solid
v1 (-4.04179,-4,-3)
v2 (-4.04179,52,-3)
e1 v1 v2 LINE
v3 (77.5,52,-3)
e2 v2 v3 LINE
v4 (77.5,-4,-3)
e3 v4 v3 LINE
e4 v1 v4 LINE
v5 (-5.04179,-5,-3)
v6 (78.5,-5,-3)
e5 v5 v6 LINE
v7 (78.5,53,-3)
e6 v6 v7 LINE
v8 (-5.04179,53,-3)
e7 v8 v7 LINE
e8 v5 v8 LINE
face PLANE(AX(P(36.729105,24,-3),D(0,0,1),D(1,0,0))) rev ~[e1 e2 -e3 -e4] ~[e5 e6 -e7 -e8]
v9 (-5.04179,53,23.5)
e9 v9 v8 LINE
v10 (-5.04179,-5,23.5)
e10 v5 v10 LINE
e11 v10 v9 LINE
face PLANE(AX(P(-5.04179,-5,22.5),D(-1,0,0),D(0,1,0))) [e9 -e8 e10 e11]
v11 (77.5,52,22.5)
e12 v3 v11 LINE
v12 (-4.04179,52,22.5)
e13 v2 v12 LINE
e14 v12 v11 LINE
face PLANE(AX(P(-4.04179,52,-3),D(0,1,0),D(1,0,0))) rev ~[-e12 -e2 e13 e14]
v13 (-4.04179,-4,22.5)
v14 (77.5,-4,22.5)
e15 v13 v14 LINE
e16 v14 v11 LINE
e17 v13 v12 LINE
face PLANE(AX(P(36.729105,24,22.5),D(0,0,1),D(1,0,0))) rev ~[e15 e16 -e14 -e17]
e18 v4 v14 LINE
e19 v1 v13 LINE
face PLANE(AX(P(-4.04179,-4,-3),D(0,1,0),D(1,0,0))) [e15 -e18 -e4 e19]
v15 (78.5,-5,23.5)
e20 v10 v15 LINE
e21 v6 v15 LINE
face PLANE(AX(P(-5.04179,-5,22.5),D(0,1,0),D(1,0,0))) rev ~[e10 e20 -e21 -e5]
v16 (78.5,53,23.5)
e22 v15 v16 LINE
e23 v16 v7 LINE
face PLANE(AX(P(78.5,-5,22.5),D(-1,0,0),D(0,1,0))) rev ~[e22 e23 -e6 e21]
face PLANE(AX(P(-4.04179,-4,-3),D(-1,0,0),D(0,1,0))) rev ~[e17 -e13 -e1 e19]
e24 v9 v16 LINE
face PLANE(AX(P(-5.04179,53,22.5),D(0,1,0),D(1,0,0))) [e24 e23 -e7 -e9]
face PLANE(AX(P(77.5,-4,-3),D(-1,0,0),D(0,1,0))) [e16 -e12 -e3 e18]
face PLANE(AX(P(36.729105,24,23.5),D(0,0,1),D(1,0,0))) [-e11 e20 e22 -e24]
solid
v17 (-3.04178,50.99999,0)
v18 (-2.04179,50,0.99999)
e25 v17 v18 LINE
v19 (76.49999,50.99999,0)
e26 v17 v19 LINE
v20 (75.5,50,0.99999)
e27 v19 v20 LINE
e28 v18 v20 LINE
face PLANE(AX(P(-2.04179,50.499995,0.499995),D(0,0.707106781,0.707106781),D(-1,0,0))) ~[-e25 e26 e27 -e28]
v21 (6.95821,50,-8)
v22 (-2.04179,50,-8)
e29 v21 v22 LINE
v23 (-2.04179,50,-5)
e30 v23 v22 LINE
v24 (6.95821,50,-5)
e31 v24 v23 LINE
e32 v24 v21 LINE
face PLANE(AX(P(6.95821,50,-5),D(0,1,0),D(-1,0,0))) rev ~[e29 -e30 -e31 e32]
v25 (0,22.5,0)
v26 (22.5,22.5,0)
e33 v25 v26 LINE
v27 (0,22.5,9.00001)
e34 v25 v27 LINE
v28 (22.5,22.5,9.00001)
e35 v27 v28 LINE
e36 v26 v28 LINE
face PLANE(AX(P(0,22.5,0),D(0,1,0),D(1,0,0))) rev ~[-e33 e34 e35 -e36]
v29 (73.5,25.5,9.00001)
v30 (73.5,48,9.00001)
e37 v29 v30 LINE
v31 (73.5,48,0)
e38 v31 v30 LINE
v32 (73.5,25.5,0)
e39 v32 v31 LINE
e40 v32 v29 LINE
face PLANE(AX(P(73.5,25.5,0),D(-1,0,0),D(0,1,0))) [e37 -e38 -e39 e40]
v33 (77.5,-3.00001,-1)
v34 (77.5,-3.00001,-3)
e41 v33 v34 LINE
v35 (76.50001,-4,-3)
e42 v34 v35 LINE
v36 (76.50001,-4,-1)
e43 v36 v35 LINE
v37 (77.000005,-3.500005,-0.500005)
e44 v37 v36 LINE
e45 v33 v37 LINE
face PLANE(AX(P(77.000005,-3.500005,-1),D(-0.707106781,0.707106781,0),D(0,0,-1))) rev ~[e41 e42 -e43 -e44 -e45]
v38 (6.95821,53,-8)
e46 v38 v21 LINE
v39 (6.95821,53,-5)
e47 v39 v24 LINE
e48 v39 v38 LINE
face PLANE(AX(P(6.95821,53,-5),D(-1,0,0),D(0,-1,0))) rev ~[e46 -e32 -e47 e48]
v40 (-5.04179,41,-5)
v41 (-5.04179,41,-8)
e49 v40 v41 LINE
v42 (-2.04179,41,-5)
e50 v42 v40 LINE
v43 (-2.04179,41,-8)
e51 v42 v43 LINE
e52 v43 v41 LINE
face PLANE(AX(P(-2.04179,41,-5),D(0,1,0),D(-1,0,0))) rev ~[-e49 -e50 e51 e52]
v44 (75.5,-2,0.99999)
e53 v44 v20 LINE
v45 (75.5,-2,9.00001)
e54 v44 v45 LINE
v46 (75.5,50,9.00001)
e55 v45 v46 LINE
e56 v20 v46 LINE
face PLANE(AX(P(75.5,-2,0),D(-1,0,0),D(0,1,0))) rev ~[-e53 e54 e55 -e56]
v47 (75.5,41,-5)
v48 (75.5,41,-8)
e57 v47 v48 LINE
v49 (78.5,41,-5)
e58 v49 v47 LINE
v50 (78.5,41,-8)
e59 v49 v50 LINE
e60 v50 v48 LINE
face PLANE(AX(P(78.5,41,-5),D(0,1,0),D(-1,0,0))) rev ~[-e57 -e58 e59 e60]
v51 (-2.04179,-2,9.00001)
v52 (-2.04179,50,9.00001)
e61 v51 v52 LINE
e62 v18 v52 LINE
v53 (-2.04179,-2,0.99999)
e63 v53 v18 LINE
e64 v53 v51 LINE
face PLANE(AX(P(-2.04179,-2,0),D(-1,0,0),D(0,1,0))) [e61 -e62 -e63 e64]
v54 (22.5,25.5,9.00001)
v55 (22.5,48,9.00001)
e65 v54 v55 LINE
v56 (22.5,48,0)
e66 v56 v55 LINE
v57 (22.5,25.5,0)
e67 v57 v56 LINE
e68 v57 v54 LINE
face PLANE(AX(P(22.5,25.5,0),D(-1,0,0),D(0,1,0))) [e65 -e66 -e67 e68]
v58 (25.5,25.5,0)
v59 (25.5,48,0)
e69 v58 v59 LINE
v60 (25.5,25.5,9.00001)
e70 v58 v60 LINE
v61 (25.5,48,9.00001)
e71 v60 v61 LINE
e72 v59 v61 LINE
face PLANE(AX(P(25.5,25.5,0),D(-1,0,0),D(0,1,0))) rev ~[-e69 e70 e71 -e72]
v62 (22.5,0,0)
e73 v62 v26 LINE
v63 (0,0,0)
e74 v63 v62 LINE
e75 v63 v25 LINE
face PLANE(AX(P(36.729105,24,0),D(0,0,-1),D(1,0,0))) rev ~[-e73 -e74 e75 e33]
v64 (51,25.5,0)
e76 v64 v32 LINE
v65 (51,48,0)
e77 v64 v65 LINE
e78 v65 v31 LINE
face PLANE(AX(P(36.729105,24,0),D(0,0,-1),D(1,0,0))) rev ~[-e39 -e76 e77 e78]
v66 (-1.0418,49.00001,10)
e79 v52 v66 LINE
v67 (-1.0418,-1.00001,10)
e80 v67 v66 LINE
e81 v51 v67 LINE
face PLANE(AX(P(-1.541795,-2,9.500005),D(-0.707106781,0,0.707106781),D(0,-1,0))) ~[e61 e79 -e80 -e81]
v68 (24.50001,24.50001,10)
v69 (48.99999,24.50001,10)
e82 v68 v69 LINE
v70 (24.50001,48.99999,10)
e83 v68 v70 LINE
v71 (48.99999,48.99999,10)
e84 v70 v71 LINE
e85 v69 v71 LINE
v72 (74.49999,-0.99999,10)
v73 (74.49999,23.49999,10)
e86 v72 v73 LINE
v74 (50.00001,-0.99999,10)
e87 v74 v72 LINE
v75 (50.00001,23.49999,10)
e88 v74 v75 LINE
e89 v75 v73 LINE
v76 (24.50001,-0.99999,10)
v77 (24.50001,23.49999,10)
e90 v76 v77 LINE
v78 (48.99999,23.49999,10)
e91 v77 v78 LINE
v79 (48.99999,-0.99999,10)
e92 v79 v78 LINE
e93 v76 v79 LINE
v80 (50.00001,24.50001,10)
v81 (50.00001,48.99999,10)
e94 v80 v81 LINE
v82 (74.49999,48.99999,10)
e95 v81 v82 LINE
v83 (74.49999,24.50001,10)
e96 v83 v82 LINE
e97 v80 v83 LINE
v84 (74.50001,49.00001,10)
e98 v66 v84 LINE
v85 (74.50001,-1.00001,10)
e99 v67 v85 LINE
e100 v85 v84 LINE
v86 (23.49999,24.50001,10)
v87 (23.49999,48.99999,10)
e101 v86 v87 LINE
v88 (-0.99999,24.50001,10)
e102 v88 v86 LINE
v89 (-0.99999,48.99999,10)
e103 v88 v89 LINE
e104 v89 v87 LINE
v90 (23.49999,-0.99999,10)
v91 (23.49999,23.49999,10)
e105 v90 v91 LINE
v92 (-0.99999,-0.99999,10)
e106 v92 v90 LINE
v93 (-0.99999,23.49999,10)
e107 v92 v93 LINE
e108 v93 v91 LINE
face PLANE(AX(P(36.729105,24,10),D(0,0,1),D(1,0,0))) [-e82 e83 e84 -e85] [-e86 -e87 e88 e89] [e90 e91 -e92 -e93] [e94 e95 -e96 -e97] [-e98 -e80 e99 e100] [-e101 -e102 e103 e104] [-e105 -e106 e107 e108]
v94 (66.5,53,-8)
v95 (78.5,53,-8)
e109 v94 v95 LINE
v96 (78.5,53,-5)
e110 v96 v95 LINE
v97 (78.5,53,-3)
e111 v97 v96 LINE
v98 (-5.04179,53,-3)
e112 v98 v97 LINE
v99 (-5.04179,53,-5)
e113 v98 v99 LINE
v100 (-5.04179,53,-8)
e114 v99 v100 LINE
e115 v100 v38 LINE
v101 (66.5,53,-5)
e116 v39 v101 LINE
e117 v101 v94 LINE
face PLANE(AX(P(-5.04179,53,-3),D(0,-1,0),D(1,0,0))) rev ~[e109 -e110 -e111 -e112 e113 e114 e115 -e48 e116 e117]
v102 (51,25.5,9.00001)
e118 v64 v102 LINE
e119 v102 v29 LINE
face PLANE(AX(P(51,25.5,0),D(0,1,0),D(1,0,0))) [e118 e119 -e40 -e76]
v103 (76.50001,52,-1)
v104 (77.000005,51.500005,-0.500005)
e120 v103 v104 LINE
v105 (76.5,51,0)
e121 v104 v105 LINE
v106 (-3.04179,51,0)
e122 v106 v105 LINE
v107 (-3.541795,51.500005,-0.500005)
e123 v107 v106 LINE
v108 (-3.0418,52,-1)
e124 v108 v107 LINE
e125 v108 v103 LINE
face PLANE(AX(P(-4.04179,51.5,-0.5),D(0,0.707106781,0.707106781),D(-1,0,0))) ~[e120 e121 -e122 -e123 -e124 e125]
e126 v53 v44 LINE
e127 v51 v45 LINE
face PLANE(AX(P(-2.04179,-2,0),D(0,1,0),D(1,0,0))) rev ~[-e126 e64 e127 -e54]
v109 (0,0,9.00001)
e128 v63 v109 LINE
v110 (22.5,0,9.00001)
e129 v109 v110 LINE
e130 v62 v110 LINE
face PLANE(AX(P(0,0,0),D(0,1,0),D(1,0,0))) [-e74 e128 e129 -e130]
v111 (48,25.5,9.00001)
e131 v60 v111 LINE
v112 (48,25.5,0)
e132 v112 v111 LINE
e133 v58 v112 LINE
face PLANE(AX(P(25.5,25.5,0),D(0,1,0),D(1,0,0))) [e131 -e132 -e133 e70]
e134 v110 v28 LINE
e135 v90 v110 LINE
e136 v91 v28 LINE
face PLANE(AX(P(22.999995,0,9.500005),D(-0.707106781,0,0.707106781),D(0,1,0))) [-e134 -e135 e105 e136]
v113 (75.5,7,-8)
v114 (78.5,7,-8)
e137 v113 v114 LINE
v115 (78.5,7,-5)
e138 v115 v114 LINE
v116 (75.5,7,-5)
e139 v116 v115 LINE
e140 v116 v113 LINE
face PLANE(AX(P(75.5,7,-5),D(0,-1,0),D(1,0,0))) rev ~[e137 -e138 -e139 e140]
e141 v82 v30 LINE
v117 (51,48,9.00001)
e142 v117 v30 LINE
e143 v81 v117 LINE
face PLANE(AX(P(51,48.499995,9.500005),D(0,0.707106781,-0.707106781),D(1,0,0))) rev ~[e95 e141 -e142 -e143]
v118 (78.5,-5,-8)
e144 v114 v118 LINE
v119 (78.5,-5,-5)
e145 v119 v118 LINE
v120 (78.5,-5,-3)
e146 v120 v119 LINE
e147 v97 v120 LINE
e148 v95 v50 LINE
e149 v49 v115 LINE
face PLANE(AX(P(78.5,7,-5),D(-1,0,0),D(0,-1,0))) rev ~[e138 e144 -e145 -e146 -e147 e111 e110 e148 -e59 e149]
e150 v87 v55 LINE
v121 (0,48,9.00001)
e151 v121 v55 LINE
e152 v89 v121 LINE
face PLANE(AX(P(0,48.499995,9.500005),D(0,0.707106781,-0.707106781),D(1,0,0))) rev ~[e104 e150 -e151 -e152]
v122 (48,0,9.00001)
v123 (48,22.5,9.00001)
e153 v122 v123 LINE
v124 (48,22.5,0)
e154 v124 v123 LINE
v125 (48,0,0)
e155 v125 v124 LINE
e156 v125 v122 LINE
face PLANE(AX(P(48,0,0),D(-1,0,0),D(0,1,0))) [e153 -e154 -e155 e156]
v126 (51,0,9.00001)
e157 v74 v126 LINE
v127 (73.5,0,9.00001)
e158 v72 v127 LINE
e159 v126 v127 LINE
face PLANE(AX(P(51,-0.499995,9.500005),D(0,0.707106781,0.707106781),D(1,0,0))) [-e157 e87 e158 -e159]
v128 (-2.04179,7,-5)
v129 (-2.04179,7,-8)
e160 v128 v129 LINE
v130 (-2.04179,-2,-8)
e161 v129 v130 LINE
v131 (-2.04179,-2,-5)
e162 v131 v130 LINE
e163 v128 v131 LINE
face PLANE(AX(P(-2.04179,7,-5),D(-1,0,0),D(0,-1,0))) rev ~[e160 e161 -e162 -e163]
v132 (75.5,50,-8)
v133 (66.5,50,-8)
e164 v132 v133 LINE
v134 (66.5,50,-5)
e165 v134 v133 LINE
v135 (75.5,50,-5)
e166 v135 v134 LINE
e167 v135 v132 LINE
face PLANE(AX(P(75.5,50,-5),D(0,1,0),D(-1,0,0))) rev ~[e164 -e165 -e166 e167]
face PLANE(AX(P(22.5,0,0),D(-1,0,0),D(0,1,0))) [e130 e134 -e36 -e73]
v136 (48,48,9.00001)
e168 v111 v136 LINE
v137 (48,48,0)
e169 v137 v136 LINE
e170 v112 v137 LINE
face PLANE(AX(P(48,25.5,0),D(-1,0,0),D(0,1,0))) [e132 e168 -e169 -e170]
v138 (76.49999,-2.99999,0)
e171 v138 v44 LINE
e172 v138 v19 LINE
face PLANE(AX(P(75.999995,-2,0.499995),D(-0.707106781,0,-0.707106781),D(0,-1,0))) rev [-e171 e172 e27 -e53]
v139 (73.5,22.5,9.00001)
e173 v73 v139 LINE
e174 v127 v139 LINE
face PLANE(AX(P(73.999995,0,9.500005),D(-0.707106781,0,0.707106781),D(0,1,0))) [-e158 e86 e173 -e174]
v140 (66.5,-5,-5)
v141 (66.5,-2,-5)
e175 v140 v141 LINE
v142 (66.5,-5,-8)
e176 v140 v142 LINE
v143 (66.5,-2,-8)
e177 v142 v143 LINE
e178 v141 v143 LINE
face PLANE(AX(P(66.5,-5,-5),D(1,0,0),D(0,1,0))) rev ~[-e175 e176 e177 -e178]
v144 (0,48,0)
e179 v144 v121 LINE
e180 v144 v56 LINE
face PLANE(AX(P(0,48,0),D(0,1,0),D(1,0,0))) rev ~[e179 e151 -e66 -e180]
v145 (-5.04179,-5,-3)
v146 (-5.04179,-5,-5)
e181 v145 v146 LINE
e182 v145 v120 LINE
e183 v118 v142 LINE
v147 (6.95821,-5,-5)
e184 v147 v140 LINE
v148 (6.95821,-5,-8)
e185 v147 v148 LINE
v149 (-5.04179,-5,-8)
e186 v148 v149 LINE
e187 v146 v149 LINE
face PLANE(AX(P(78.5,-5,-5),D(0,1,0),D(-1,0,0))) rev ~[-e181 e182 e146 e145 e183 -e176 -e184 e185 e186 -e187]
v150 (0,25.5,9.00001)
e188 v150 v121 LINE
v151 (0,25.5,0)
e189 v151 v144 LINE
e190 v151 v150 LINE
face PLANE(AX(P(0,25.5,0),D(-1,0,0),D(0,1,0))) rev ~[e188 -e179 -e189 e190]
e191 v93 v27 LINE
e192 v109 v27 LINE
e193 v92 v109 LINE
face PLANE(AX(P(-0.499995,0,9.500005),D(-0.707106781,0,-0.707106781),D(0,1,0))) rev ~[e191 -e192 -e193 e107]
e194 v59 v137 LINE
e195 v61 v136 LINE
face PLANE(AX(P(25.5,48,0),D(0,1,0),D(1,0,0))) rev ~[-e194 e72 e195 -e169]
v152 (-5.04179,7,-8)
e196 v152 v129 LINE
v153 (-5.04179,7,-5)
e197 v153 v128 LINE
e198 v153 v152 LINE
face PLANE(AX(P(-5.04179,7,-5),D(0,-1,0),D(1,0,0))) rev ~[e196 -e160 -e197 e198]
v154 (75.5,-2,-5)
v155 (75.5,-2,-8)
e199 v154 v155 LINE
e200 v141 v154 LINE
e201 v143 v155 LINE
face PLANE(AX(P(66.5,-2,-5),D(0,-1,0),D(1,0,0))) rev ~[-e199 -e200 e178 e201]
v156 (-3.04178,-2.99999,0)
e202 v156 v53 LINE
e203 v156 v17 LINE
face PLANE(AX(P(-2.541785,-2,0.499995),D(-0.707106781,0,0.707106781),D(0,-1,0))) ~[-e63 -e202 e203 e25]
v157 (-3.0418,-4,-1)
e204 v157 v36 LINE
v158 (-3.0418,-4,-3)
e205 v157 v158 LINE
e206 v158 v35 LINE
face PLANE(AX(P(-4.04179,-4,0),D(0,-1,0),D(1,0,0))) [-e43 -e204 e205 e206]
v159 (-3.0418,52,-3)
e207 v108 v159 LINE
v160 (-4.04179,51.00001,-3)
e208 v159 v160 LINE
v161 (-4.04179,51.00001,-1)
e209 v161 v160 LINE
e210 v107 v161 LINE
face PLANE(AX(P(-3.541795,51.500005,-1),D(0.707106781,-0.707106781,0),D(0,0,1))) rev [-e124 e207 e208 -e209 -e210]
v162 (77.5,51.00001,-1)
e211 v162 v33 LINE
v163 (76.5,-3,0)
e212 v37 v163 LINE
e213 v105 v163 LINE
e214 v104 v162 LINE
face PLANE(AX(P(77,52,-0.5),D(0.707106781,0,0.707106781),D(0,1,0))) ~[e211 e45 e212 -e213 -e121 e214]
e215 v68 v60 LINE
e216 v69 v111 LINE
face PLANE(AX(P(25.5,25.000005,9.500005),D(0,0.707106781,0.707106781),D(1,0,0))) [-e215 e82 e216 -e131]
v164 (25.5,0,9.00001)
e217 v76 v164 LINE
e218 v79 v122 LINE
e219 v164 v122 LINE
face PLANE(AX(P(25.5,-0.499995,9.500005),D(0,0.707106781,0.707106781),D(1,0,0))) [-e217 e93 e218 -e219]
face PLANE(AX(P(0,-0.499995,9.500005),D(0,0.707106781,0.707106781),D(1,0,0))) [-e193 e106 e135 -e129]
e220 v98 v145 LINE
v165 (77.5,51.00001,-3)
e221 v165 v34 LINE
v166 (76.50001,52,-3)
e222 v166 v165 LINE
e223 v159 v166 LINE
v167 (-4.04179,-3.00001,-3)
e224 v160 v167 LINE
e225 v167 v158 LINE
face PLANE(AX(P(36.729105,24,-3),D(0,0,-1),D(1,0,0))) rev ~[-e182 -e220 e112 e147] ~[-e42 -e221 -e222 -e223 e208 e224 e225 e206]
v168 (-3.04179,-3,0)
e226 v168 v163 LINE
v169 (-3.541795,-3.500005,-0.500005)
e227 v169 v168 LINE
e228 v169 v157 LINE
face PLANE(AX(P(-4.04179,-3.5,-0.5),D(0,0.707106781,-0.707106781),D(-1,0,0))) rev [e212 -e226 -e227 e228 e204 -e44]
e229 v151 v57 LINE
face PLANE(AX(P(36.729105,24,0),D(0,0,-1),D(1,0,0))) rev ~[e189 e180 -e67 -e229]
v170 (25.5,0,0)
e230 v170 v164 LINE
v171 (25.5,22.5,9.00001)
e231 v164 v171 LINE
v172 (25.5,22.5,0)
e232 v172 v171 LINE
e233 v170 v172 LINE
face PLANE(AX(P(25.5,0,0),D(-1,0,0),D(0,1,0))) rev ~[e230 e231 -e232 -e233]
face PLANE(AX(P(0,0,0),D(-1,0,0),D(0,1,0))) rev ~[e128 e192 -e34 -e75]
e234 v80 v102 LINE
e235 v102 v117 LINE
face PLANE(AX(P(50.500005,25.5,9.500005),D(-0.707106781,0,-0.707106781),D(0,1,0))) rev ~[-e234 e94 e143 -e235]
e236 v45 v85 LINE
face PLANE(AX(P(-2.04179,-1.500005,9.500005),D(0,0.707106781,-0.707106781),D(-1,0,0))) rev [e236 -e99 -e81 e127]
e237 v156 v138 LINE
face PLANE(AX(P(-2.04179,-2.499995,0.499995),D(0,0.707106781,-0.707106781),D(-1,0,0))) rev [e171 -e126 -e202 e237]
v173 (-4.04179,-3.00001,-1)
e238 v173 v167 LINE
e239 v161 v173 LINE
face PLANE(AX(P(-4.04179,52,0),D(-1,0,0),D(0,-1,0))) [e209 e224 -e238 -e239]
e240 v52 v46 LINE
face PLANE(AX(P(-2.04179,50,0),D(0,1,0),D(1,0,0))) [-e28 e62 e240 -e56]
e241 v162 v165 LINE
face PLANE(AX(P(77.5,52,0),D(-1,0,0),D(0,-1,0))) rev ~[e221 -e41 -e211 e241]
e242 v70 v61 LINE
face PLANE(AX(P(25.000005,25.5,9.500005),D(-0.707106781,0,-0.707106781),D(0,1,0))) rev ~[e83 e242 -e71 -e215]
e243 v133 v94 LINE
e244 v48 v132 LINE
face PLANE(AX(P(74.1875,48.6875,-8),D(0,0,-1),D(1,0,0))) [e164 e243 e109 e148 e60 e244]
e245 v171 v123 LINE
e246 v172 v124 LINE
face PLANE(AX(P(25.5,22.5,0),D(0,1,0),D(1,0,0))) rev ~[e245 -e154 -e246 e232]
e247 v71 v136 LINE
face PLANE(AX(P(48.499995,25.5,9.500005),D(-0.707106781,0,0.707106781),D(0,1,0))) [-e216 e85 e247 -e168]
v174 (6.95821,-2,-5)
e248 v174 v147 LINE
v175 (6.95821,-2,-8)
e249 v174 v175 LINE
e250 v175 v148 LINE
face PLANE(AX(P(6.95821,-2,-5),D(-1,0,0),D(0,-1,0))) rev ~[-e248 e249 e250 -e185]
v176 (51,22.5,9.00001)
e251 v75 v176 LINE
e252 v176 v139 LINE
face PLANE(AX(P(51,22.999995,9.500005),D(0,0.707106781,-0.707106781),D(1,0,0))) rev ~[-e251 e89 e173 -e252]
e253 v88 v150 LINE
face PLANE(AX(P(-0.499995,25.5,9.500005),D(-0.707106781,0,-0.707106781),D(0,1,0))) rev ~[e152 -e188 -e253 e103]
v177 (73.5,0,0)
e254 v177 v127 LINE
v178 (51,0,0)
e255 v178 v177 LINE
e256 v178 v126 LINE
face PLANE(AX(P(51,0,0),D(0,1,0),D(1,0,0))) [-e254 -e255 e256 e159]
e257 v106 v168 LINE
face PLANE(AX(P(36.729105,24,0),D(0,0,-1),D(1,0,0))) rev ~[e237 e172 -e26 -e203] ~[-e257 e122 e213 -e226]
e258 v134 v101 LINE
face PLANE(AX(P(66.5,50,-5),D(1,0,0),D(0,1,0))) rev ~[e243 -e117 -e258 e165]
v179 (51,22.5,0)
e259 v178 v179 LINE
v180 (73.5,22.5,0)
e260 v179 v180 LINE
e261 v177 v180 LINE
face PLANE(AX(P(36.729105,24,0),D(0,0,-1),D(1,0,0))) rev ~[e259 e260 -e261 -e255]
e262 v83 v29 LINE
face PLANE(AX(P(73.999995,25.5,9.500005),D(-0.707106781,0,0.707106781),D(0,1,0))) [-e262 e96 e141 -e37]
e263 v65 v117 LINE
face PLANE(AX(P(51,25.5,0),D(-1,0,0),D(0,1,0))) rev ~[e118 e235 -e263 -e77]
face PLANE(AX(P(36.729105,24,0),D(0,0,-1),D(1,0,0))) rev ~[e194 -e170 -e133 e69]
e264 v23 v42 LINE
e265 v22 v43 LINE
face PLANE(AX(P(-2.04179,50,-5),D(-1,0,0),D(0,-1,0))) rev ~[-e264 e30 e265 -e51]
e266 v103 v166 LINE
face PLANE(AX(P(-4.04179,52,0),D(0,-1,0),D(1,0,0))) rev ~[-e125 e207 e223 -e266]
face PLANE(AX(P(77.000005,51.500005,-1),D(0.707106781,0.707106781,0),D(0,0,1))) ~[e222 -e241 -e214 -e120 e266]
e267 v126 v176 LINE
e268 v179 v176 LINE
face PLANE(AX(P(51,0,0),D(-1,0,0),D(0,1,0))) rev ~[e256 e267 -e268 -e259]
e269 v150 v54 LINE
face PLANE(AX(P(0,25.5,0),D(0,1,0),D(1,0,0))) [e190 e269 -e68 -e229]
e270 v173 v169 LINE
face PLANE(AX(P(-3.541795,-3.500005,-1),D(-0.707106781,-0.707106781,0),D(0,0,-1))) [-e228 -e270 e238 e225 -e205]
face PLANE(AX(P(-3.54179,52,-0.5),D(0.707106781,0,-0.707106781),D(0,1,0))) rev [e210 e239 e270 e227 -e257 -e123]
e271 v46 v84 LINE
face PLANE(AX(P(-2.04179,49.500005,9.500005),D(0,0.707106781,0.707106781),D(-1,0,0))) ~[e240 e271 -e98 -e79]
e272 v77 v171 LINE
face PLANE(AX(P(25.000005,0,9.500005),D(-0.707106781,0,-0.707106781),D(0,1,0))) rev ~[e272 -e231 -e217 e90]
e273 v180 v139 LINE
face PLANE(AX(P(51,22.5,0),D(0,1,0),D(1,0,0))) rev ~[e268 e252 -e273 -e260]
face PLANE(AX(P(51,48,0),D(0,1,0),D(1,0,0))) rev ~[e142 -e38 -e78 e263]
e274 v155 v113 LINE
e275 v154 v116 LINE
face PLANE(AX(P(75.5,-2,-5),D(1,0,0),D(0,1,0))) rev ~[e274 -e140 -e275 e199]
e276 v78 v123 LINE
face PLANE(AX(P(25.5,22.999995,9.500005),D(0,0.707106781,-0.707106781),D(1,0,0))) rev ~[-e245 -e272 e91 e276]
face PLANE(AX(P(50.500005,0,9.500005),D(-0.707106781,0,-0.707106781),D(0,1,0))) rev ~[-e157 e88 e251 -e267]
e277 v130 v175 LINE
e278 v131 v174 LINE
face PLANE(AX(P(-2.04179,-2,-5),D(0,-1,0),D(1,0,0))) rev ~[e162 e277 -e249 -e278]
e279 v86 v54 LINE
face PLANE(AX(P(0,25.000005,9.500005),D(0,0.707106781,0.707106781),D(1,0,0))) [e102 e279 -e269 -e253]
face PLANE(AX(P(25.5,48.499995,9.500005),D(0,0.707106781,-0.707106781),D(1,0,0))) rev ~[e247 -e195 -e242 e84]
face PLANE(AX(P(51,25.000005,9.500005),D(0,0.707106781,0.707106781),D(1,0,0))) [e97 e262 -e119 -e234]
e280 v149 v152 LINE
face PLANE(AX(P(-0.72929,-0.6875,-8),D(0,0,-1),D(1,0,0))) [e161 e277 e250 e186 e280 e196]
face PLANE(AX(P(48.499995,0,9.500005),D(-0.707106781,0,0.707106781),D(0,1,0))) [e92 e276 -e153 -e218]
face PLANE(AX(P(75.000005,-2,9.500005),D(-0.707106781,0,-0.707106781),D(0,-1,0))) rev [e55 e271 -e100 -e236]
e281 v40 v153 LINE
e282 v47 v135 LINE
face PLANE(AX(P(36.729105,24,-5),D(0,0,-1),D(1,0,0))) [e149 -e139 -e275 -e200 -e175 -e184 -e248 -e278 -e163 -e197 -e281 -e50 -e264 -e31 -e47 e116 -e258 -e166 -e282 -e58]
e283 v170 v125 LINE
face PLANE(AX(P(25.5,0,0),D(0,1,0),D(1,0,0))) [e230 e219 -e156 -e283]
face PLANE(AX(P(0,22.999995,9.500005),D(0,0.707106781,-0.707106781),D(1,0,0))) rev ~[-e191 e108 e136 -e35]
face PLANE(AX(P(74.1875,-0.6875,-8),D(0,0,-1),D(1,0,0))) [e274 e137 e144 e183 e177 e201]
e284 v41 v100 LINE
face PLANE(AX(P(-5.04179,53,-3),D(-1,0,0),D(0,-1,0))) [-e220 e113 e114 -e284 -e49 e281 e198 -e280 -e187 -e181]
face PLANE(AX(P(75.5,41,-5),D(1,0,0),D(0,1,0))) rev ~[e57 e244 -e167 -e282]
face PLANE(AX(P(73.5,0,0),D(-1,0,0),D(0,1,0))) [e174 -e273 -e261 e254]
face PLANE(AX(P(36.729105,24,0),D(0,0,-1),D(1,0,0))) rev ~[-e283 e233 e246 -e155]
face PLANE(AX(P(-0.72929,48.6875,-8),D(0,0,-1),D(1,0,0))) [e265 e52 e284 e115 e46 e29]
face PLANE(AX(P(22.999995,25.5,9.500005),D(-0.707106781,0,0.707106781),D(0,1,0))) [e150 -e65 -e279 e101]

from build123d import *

# Parameters (mm, degrees)
F0_W      = 77.5417897031
F0_H      = 52
F0_W_2    = 22.5
F0_H_2    = 22.5
F1_DEPTH  = 10
F2_W      = 81.5417897031
F2_H      = 56
F3_DEPTH  = 3
F4_W      = 83.5417897031
F4_H      = 58
F5_DEPTH  = 2
F6_SIZE   = 1
F7_SIZE   = 0.99999
F9_DEPTH  = 3
F10_W     = 83.5417897031
F10_H     = 58
F10_W_2   = 81.5417897031
F10_H_2   = 56
F11_DEPTH = 25.5
F12_W     = 83.5417897031
F12_H     = 58
F13_DEPTH = 1


# Not quite as in the source:
# - a fillet or chamfer is up to 0.001 mm smaller than in the source, because OpenCascade refuses the exact size


with BuildPart() as f1:
    # F0 (on Top) → F1 (new body)
    with BuildSketch(Plane.XY):
        with Locations((36.7291051485, 24)):
            Rectangle(F0_W, F0_H)
        with Locations((11.25, 11.25)):
            Rectangle(F0_W_2, F0_H_2, mode=Mode.SUBTRACT)
        with Locations((36.75, 11.25)):
            Rectangle(F0_W_2, F0_H_2, mode=Mode.SUBTRACT)
        with Locations((62.25, 11.25)):
            Rectangle(F0_W_2, F0_H_2, mode=Mode.SUBTRACT)
        with Locations((11.25, 36.75)):
            Rectangle(F0_W_2, F0_H_2, mode=Mode.SUBTRACT)
        with Locations((36.75, 36.75)):
            Rectangle(F0_W_2, F0_H_2, mode=Mode.SUBTRACT)
        with Locations((62.25, 36.75)):
            Rectangle(F0_W_2, F0_H_2, mode=Mode.SUBTRACT)
    extrude(amount=F1_DEPTH)

    # F2 (on face) → F3 (join)
    with BuildSketch(Plane(origin=(0, 0, 0), x_dir=(1, 0, 0), z_dir=(0, 0, -1))):
        with Locations((36.7291051485, -24)):
            Rectangle(F2_W, F2_H)
    extrude(amount=F3_DEPTH)

    # F4 (on face) → F5 (join)
    with BuildSketch(Plane(origin=(0, 0, -3), x_dir=(1, 0, 0), z_dir=(0, 0, -1))):
        with Locations((36.7291051485, -24)):
            Rectangle(F4_W, F4_H)
    extrude(amount=F5_DEPTH)

    # F6
    f6_edges = [f1.edges().sort_by_distance(p)[0] for p in [
        (77.5, 24, 0),
        (36.729105, 52, 0),
        (-4.04179, 24, 0),
        (36.729105, -4, 0),
    ]]
    chamfer(f6_edges, length=F6_SIZE)

    # F7 (size 1 in the source; OpenCascade refuses exactly that, so slightly less here)
    f7_edges = [f1.edges().sort_by_distance(p)[0] for p in [
        (22.5, 11.25, 10),
        (11.25, 0, 10),
        (0, 11.25, 10),
        (11.25, 22.5, 10),
        (48, 11.25, 10),
        (36.75, 0, 10),
        (25.5, 11.25, 10),
        (36.75, 22.5, 10),
        (62.25, 22.5, 10),
        (73.5, 11.25, 10),
        (62.25, 0, 10),
        (51, 11.25, 10),
        (62.25, 25.5, 10),
        (73.5, 36.75, 10),
        (62.25, 48, 10),
        (51, 36.75, 10),
        (36.75, 25.5, 10),
        (48, 36.75, 10),
        (36.75, 48, 10),
        (22.5, 36.75, 10),
        (11.25, 25.5, 10),
        (0, 36.75, 10),
        (-2.04179, 24, 10),
        (36.729105, -2, 10),
        (75.5, 24, 10),
        (36.729105, 50, 10),
        (11.25, 48, 10),
        (25.5, 36.75, 10),
        (36.729105, 50, 0),
        (-2.04179, 24, 0),
        (75.5, 24, 0),
        (36.729105, -2, 0),
        (-4.04179, -4, -2),
        (-4.04179, 52, -2),
        (77.5, 52, -2),
        (77.5, -4, -2),
    ]]
    chamfer(f7_edges, length=F7_SIZE)

    # F8 (on face) → F9 (join)
    with BuildSketch(Plane(origin=(0, 0, -5), x_dir=(1, 0, 0), z_dir=(0, 0, -1))):
        Polygon((75.5, -7), (78.5, -7), (78.5, 5), (66.5, 5), (66.5, 2), (75.5, 2), align=None)
        Polygon((66.5, -53), (78.5, -53), (78.5, -41), (75.5, -41), (75.5, -50), (66.5, -50), align=None)
        Polygon((-5.0417897031, -53), (6.9582102969, -53), (6.9582102969, -50), (-2.0417897031, -50), (-2.0417897031, -41), (-5.0417897031, -41), align=None)
        Polygon((6.9582102969, 2), (6.9582102969, 5), (-5.0417897031, 5), (-5.0417897031, -7), (-2.0417897031, -7), (-2.0417897031, 2), align=None)
    extrude(amount=F9_DEPTH)


with BuildPart() as f11:
    # F10 (on face) → F11 (new body)
    with BuildSketch(Plane.XY.offset(-3)):
        with Locations((36.7291051485, 24)):
            Rectangle(F10_W, F10_H)
        with Locations((36.7291051485, 24)):
            Rectangle(F10_W_2, F10_H_2, mode=Mode.SUBTRACT)
    extrude(amount=F11_DEPTH)

    # F12 (on face) → F13 (join)
    with BuildSketch(Plane.XY.offset(22.5)):
        with Locations((36.7291051485, 24)):
            Rectangle(F12_W, F12_H)
    extrude(amount=F13_DEPTH)


solid = Compound([f1.part, f11.part])
